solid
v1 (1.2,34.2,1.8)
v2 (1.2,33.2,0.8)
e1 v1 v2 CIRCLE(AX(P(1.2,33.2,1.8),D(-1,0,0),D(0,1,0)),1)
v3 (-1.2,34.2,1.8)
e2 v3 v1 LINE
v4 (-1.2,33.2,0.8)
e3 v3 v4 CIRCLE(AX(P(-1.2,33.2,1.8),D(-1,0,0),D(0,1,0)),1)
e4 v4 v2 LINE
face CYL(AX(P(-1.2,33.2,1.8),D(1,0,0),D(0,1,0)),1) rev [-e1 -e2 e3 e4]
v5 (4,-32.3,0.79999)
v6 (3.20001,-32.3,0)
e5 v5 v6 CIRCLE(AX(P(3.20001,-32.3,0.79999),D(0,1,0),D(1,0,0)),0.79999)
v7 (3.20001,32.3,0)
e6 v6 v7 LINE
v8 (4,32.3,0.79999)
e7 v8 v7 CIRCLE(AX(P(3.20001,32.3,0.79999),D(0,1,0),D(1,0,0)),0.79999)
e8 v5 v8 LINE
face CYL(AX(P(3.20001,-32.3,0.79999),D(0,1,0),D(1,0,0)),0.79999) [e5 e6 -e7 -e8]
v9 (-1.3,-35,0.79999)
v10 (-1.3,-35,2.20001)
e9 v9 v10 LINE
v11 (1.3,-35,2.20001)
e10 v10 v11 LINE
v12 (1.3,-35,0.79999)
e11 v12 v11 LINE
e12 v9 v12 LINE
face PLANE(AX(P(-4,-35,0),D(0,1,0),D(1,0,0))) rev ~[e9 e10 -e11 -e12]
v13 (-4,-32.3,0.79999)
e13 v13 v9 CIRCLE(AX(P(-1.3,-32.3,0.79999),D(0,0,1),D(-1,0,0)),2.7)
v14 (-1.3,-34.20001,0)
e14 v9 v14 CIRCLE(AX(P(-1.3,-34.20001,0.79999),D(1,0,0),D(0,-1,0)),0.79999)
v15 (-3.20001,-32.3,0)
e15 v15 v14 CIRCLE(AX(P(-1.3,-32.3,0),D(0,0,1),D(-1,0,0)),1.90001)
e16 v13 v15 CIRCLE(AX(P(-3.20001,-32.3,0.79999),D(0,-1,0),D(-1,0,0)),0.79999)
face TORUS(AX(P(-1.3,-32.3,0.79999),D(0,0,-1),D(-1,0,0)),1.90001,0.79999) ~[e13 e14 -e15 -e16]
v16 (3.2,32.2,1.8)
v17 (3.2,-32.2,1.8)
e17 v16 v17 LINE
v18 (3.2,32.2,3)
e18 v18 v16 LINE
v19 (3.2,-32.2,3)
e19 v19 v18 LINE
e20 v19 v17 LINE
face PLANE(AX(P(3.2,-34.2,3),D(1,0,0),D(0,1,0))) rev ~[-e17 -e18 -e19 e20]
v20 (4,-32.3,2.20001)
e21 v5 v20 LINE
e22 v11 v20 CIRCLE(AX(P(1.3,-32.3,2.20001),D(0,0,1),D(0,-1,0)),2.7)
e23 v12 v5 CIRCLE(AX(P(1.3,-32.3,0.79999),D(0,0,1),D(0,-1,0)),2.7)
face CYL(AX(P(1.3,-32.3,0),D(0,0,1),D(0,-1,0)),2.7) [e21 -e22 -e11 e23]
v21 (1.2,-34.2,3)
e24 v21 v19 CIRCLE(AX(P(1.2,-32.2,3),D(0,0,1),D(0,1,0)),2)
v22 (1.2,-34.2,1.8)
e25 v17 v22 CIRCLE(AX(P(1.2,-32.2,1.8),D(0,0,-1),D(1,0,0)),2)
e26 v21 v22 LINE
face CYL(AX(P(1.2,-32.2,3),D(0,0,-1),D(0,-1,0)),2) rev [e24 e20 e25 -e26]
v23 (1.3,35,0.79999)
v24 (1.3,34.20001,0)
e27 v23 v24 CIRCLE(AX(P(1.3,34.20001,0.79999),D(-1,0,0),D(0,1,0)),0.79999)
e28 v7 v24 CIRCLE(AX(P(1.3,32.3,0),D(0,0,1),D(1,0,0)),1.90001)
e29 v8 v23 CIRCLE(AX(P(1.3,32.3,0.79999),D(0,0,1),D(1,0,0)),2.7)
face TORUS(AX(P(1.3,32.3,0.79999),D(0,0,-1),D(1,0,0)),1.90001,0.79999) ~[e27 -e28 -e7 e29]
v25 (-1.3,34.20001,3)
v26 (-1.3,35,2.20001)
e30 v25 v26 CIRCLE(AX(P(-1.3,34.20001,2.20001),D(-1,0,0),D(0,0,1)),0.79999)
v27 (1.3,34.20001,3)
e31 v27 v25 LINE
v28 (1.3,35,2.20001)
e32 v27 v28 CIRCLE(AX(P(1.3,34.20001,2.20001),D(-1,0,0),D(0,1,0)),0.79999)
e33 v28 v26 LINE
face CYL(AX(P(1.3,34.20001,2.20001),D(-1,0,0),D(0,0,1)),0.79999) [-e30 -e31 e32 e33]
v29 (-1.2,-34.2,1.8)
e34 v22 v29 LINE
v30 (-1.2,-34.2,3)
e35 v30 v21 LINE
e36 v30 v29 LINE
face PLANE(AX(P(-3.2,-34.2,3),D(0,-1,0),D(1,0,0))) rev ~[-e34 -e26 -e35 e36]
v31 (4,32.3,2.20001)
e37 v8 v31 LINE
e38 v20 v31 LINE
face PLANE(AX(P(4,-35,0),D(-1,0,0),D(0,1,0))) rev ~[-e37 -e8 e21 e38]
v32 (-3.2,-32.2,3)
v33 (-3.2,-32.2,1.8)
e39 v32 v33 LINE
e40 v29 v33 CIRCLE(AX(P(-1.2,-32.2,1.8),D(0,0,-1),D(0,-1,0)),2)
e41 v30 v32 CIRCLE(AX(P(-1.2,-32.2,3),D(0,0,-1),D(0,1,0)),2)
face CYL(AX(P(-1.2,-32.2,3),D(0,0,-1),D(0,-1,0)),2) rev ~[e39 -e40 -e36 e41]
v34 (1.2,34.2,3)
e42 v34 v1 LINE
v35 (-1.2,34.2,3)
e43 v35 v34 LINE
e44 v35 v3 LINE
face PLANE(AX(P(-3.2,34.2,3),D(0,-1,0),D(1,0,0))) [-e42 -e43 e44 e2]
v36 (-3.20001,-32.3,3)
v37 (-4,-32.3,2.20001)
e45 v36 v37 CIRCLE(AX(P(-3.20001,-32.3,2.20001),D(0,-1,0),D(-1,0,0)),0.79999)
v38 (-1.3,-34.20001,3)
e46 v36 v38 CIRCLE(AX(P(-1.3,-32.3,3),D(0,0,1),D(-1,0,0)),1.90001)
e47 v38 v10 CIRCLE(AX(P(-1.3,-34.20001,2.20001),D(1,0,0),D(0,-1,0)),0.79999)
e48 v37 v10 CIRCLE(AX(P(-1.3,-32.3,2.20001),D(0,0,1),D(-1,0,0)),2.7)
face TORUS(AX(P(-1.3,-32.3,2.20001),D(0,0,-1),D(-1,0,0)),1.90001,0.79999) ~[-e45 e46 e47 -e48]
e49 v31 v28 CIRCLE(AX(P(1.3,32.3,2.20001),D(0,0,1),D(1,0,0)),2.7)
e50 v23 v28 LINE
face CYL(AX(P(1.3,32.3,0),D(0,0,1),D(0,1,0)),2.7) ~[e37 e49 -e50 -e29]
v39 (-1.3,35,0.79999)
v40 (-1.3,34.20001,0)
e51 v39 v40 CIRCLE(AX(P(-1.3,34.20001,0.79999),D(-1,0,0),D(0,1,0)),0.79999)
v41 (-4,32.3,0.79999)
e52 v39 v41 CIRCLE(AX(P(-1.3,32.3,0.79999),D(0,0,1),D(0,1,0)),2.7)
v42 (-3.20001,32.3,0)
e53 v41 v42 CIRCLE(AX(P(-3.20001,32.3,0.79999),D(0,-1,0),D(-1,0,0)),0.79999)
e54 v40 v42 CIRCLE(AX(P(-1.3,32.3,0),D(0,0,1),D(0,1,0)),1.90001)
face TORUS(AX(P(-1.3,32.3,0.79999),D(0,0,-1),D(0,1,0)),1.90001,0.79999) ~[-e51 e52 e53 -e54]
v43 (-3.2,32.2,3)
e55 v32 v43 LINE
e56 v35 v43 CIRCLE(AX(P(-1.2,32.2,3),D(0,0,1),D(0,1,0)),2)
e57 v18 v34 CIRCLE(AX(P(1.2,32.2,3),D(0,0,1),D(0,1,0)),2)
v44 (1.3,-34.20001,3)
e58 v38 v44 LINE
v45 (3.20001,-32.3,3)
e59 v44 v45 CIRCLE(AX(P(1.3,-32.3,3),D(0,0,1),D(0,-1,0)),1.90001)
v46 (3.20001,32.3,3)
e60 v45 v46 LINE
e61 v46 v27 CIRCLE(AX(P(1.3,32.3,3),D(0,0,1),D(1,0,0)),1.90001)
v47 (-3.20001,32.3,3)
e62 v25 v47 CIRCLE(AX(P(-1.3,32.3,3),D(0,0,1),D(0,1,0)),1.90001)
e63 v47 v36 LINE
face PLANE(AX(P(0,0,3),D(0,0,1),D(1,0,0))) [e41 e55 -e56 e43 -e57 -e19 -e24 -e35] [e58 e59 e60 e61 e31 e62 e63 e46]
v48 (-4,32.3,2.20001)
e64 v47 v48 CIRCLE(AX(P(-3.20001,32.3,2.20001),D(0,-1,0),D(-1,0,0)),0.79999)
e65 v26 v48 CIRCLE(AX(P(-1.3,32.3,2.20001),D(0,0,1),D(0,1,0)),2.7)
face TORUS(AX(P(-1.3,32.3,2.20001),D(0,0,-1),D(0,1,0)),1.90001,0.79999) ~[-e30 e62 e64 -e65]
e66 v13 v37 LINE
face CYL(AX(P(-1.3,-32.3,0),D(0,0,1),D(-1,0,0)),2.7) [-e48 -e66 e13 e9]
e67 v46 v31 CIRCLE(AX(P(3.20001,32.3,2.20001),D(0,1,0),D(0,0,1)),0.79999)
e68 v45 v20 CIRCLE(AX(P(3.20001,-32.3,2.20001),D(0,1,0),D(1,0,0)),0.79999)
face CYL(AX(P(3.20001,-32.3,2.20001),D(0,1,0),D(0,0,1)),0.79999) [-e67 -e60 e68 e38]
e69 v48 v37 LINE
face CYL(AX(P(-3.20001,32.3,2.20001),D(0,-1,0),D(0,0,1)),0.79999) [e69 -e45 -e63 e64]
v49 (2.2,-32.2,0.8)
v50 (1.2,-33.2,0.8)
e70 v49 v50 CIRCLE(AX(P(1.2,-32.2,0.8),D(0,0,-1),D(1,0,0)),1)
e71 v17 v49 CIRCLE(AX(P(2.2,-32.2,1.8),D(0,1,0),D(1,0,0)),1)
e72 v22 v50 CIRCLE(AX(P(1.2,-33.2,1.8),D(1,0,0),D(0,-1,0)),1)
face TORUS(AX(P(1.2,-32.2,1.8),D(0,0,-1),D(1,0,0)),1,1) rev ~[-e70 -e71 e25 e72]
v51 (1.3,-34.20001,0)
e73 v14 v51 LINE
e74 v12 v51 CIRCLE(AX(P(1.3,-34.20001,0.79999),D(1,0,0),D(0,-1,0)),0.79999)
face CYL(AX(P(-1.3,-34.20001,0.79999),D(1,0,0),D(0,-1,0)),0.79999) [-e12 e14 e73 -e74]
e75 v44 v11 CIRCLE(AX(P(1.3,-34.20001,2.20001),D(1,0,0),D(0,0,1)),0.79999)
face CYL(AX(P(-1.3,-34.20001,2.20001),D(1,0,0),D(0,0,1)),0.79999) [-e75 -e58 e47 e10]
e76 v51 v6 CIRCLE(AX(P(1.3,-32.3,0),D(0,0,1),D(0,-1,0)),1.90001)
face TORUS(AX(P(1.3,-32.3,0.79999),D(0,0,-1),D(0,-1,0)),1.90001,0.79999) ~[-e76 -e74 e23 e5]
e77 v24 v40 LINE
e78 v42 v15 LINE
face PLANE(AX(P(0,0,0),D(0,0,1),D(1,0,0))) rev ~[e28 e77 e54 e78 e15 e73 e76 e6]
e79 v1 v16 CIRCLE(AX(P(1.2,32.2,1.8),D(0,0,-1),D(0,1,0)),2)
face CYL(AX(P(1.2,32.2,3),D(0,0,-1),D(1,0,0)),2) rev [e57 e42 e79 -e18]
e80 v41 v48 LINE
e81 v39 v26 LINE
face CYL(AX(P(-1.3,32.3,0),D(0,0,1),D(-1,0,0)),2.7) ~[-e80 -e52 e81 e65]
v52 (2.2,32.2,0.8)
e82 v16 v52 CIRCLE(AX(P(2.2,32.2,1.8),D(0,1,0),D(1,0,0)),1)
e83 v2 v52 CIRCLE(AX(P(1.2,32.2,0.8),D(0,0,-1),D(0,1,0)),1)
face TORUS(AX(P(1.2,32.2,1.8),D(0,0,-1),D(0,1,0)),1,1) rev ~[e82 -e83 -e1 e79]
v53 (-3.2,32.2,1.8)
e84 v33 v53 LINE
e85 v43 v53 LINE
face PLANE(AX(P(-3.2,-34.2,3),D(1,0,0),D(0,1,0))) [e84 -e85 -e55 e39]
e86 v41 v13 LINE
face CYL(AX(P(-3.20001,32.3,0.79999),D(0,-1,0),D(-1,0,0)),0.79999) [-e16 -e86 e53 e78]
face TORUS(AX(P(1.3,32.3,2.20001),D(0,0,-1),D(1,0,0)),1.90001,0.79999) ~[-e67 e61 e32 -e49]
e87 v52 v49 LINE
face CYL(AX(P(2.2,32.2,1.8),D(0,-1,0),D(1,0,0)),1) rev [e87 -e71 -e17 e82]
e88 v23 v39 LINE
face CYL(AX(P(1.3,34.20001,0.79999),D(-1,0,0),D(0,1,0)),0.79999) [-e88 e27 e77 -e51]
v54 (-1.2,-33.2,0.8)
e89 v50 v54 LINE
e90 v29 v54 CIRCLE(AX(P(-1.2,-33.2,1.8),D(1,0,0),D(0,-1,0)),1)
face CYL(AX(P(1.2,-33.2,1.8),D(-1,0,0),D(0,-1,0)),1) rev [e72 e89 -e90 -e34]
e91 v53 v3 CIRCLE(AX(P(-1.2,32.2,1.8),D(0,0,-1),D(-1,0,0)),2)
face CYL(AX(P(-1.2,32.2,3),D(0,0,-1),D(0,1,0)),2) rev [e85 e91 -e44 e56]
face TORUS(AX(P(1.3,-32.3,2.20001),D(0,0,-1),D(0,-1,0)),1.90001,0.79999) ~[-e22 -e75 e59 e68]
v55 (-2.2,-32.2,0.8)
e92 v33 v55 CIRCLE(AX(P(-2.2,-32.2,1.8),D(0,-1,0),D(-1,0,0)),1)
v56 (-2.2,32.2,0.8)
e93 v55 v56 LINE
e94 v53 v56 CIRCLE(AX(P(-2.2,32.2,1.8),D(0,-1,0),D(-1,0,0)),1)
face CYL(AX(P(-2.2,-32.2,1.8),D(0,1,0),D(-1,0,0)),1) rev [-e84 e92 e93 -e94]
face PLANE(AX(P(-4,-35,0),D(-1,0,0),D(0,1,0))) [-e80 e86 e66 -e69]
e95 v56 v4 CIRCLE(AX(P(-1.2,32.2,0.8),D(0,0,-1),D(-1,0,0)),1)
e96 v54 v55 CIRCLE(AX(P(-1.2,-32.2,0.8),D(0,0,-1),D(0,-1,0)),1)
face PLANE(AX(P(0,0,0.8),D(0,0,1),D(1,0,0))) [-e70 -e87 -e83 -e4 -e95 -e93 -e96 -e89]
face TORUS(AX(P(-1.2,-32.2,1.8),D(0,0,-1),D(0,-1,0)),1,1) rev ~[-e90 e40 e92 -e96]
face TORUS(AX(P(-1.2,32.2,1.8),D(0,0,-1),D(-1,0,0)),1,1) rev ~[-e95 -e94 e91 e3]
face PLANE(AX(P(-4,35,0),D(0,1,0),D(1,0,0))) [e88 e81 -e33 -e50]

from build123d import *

# Parameters (mm, degrees)
F0_W     = 8
F0_H     = 70
F1_DEPTH = 3
F2_W     = 6.4
F2_H     = 68.4
F3_DEPTH = 2.2
F4_R     = 2.7
F5_R     = 2
F6_R     = 0.79999
F7_R     = 1


# Not quite as in the source:
# - a fillet or chamfer is up to 0.001 mm smaller than in the source, because OpenCascade refuses the exact size


with BuildPart() as f1:
    # F0 (on Top) → F1 (new body)
    with BuildSketch(Plane.XY):
        Rectangle(F0_W, F0_H)
    extrude(amount=F1_DEPTH)

    # F2 (on face) → F3 (cut)
    with BuildSketch(Plane.XY.offset(3)):
        Rectangle(F2_W, F2_H)
    extrude(amount=-F3_DEPTH, mode=Mode.SUBTRACT)

    # F4
    f4_edges = [f1.edges().sort_by_distance(p)[0] for p in [
        (4, -35, 1.5),
        (-4, -35, 1.5),
        (-4, 35, 1.5),
        (4, 35, 1.5),
    ]]
    fillet(f4_edges, radius=F4_R)

    # F5
    f5_edges = [f1.edges().sort_by_distance(p)[0] for p in [
        (-3.2, 34.2, 1.9),
        (3.2, 34.2, 1.9),
        (-3.2, -34.2, 1.9),
        (3.2, -34.2, 1.9),
    ]]
    fillet(f5_edges, radius=F5_R)

    # F6 (radius 0.8 in the source; OpenCascade refuses exactly that, so slightly less here)
    f6_edges = [f1.edges().sort_by_distance(p)[0] for p in [
        (-3.209188, -34.209188, 0),
        (-3.209188, -34.209188, 3),
    ]]
    fillet(f6_edges, radius=F6_R)

    # F7
    f7_edges = [f1.edges().sort_by_distance(p)[0] for p in [
        (-2.614214, -33.614214, 0.8),
    ]]
    fillet(f7_edges, radius=F7_R)


solid = f1.part
